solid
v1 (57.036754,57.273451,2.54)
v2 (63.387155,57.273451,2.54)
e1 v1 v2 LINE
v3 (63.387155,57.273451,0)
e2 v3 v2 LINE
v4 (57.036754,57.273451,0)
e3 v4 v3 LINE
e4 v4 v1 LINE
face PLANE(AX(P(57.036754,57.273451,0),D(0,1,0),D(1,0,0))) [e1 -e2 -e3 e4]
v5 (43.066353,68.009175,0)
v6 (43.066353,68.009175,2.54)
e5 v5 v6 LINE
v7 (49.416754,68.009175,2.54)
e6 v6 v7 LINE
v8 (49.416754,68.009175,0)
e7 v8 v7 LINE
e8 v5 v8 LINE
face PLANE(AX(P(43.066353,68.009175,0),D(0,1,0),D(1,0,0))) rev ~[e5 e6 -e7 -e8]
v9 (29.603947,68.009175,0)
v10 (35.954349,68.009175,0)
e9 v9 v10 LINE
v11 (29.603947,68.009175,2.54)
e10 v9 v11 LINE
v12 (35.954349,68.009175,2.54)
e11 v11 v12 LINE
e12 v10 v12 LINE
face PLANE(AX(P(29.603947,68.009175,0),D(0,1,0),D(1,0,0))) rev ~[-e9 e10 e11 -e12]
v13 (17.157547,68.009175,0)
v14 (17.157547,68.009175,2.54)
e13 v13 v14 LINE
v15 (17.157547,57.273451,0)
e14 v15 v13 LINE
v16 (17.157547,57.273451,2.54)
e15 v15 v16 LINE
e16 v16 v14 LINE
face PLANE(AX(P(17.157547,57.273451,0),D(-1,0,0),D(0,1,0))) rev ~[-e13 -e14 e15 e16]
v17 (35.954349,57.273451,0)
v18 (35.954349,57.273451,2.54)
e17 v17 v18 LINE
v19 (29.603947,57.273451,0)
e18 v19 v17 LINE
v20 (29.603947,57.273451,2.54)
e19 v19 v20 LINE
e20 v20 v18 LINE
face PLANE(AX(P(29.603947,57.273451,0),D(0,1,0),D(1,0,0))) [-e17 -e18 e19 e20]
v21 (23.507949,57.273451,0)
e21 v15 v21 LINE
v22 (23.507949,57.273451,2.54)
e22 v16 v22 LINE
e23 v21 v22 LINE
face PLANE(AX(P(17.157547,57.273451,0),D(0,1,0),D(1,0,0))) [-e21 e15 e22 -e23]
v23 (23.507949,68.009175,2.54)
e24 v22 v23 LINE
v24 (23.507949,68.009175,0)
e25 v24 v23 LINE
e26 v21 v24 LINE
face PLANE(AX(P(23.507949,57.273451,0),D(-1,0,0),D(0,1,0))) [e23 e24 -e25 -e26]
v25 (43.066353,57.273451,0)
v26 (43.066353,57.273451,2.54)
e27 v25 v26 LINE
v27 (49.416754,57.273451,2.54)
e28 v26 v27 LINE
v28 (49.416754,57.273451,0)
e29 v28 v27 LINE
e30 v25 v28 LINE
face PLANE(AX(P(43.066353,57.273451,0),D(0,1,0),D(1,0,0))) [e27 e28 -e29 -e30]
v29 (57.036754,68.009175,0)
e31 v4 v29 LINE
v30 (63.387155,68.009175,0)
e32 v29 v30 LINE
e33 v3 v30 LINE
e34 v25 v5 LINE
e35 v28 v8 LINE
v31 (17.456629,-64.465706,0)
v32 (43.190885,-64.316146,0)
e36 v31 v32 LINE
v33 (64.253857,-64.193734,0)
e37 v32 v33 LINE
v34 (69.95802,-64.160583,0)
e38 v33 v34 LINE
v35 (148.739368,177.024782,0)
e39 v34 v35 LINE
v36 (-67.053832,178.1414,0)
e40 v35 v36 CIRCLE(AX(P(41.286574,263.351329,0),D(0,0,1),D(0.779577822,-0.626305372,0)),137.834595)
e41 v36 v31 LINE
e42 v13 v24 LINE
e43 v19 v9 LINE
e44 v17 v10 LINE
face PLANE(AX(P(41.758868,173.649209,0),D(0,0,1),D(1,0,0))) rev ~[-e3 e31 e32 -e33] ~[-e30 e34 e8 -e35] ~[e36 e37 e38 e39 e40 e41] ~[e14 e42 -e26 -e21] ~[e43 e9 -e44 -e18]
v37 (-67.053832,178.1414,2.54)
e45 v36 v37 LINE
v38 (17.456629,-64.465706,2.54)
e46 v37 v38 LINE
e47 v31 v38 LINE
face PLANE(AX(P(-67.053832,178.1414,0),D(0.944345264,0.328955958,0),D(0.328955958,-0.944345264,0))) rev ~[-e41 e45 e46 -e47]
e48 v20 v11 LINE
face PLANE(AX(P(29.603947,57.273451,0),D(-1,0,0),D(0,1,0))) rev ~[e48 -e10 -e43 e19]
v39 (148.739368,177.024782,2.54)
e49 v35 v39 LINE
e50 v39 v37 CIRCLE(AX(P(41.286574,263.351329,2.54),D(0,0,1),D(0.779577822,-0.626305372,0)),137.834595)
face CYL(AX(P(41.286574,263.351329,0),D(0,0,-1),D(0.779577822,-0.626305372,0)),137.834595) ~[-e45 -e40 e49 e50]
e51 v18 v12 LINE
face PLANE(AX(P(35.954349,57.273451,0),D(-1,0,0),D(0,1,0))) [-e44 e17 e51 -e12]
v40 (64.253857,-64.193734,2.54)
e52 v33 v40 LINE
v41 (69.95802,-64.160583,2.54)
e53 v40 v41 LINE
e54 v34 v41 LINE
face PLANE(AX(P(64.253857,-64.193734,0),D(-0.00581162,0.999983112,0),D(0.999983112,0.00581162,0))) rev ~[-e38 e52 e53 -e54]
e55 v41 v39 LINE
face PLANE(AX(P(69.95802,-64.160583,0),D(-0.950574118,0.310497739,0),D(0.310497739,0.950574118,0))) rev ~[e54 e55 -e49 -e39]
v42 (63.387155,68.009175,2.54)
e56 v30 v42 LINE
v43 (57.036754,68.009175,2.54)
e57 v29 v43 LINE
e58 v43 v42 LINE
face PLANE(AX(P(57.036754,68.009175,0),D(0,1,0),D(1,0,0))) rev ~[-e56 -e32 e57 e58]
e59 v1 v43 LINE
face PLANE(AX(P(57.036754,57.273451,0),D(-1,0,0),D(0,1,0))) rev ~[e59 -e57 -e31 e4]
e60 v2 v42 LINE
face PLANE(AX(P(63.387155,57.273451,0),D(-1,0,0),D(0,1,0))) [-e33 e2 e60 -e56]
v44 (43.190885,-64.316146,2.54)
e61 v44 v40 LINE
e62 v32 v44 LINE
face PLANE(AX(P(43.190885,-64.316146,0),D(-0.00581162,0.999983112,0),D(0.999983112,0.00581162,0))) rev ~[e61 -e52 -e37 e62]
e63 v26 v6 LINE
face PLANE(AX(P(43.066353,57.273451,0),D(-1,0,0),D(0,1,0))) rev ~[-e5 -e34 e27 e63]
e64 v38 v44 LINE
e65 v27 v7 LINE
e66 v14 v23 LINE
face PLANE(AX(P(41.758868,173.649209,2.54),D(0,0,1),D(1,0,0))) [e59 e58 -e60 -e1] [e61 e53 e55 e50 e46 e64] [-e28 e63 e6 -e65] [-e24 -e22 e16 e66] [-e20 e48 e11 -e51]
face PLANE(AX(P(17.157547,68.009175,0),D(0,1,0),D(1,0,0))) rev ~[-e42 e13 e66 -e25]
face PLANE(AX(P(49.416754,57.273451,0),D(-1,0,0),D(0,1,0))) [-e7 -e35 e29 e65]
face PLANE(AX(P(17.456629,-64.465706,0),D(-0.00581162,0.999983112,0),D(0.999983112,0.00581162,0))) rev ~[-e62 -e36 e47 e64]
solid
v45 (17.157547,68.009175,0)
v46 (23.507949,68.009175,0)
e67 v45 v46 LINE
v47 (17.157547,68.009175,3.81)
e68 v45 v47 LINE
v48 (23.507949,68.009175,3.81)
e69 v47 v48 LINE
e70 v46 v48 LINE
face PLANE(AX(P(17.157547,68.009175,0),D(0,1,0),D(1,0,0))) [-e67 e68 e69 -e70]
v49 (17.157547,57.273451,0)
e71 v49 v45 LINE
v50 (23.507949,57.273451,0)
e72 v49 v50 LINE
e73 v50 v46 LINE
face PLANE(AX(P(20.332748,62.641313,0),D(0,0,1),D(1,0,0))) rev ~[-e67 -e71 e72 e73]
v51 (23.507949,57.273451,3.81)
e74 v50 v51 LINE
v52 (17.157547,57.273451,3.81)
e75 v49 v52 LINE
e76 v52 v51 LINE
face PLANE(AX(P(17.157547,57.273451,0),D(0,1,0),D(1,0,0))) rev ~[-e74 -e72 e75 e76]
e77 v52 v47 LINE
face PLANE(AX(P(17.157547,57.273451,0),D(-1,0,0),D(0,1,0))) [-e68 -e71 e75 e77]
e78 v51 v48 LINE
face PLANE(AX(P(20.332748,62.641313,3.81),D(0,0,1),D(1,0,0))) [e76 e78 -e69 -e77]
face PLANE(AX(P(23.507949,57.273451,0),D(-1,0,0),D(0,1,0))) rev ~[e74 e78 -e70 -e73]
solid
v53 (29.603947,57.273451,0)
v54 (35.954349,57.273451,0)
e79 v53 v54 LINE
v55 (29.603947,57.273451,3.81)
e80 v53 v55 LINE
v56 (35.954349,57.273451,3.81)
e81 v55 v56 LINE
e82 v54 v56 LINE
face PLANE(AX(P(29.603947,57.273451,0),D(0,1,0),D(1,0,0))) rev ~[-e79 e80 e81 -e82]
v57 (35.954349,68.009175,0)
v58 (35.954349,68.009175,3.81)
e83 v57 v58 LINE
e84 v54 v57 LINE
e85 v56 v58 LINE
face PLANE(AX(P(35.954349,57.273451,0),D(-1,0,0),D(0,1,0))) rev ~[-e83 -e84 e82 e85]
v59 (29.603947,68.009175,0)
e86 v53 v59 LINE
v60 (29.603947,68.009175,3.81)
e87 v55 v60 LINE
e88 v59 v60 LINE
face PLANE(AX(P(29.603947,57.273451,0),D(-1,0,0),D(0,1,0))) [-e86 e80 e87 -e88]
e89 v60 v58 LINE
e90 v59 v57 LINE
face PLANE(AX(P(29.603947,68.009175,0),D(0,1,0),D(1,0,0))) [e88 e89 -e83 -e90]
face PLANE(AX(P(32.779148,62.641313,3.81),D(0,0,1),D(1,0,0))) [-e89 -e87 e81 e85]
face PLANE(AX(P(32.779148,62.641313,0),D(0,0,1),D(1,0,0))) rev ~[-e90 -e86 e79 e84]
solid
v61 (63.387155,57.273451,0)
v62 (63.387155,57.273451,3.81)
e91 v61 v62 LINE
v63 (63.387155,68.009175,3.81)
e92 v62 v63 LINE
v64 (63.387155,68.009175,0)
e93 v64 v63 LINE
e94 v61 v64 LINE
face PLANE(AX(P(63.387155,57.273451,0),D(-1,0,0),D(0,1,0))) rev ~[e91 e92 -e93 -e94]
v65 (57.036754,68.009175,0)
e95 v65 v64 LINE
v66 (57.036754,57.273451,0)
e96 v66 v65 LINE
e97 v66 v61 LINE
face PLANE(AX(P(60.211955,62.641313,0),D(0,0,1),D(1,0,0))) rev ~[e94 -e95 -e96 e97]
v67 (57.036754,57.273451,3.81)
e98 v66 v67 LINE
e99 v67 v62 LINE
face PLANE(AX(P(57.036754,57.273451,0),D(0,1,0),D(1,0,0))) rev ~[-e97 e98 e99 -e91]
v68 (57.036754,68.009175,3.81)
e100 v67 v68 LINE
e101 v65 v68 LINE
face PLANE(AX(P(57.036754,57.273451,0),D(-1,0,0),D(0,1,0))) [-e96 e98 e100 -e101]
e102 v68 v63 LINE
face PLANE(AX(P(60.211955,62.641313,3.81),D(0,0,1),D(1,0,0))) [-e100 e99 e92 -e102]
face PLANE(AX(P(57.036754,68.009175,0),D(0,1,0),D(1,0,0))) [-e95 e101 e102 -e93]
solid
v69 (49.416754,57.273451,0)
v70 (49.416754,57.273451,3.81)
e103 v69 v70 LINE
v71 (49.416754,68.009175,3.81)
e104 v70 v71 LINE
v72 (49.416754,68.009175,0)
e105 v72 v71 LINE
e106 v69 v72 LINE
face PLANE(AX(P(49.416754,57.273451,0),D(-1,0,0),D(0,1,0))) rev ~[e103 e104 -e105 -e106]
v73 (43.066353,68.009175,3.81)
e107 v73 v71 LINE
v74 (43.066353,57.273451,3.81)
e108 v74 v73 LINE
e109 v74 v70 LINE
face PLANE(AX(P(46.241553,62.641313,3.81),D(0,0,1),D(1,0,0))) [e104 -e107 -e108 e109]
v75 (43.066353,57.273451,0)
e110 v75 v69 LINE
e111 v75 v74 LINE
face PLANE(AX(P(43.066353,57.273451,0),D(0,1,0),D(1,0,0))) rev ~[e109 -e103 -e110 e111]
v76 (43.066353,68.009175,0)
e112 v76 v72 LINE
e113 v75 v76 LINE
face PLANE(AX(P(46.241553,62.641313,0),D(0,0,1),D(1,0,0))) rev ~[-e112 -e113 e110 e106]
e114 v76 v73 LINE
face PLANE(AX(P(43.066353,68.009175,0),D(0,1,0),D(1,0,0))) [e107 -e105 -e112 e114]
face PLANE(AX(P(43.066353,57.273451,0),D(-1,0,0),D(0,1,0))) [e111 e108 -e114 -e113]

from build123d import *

# Parameters (mm, degrees)
F0_W     = 6.3504016859
F0_H     = 10.7357241213
F5_DEPTH = 3.81
F6_DEPTH = 2.54


# Not quite as in the source:
# - the program builds the solid bodies; features that only make, move or delete a surface that nothing else refers to are left out


with BuildPart() as f5:
    # F0 (on Top) → F5 (new body)
    with BuildSketch(Plane.XY):
        with Locations((20.3327481219, 62.6413132995)):
            Rectangle(F0_W, F0_H)
    extrude(amount=F5_DEPTH)


with BuildPart() as f5b:
    # F0 (on Top) → F5, piece 2 (new body)
    with BuildSketch(Plane.XY):
        with Locations((32.7791477969, 62.6413132995)):
            Rectangle(F0_W, F0_H)
    extrude(amount=F5_DEPTH)


with BuildPart() as f5c:
    # F0 (on Top) → F5, piece 3 (new body)
    with BuildSketch(Plane.XY):
        with Locations((46.2415534487, 62.6413132995)):
            Rectangle(F0_W, F0_H)
    extrude(amount=F5_DEPTH)


with BuildPart() as f5d:
    # F0 (on Top) → F5, piece 4 (new body)
    with BuildSketch(Plane.XY):
        with Locations((60.2119545868, 62.6413132995)):
            Rectangle(F0_W, F0_H)
    extrude(amount=F5_DEPTH)


with BuildPart() as f6:
    # F0 (on Top) → F6 (new body)
    with BuildSketch(Plane.XY):
        with BuildLine():
            Line((69.9580198012, -64.1605830248), (148.7393677235, 177.0247817039))
            ThreePointArc((148.7393677235, 177.0247817039), (41.9997875967, 401.1840791368), (-67.0538321137, 178.141400218))
            Line((-67.0538321137, 178.141400218), (17.4566285457, -64.4657063324))
            Line((17.4566285457, -64.4657063324), (23.8170791066, -64.4287411841))
            Line((23.8170791066, -64.4287411841), (43.1908853352, -64.3161460757))
            Line((43.1908853352, -64.3161460757), (64.2538569655, -64.1937340135))
            Line((64.2538569655, -64.1937340135), (69.9580198012, -64.1605830248))
        make_face()
        with Locations((20.3327481219, 62.6413132995)):
            Rectangle(F0_W, F0_H, mode=Mode.SUBTRACT)
        with Locations((32.7791477969, 62.6413132995)):
            Rectangle(F0_W, F0_H, mode=Mode.SUBTRACT)
        with Locations((46.2415534487, 62.6413132995)):
            Rectangle(F0_W, F0_H, mode=Mode.SUBTRACT)
        with Locations((60.2119545868, 62.6413132995)):
            Rectangle(F0_W, F0_H, mode=Mode.SUBTRACT)
    extrude(amount=F6_DEPTH)


solid = Compound([f5.part, f5b.part, f5c.part, f5d.part, f6.part])
